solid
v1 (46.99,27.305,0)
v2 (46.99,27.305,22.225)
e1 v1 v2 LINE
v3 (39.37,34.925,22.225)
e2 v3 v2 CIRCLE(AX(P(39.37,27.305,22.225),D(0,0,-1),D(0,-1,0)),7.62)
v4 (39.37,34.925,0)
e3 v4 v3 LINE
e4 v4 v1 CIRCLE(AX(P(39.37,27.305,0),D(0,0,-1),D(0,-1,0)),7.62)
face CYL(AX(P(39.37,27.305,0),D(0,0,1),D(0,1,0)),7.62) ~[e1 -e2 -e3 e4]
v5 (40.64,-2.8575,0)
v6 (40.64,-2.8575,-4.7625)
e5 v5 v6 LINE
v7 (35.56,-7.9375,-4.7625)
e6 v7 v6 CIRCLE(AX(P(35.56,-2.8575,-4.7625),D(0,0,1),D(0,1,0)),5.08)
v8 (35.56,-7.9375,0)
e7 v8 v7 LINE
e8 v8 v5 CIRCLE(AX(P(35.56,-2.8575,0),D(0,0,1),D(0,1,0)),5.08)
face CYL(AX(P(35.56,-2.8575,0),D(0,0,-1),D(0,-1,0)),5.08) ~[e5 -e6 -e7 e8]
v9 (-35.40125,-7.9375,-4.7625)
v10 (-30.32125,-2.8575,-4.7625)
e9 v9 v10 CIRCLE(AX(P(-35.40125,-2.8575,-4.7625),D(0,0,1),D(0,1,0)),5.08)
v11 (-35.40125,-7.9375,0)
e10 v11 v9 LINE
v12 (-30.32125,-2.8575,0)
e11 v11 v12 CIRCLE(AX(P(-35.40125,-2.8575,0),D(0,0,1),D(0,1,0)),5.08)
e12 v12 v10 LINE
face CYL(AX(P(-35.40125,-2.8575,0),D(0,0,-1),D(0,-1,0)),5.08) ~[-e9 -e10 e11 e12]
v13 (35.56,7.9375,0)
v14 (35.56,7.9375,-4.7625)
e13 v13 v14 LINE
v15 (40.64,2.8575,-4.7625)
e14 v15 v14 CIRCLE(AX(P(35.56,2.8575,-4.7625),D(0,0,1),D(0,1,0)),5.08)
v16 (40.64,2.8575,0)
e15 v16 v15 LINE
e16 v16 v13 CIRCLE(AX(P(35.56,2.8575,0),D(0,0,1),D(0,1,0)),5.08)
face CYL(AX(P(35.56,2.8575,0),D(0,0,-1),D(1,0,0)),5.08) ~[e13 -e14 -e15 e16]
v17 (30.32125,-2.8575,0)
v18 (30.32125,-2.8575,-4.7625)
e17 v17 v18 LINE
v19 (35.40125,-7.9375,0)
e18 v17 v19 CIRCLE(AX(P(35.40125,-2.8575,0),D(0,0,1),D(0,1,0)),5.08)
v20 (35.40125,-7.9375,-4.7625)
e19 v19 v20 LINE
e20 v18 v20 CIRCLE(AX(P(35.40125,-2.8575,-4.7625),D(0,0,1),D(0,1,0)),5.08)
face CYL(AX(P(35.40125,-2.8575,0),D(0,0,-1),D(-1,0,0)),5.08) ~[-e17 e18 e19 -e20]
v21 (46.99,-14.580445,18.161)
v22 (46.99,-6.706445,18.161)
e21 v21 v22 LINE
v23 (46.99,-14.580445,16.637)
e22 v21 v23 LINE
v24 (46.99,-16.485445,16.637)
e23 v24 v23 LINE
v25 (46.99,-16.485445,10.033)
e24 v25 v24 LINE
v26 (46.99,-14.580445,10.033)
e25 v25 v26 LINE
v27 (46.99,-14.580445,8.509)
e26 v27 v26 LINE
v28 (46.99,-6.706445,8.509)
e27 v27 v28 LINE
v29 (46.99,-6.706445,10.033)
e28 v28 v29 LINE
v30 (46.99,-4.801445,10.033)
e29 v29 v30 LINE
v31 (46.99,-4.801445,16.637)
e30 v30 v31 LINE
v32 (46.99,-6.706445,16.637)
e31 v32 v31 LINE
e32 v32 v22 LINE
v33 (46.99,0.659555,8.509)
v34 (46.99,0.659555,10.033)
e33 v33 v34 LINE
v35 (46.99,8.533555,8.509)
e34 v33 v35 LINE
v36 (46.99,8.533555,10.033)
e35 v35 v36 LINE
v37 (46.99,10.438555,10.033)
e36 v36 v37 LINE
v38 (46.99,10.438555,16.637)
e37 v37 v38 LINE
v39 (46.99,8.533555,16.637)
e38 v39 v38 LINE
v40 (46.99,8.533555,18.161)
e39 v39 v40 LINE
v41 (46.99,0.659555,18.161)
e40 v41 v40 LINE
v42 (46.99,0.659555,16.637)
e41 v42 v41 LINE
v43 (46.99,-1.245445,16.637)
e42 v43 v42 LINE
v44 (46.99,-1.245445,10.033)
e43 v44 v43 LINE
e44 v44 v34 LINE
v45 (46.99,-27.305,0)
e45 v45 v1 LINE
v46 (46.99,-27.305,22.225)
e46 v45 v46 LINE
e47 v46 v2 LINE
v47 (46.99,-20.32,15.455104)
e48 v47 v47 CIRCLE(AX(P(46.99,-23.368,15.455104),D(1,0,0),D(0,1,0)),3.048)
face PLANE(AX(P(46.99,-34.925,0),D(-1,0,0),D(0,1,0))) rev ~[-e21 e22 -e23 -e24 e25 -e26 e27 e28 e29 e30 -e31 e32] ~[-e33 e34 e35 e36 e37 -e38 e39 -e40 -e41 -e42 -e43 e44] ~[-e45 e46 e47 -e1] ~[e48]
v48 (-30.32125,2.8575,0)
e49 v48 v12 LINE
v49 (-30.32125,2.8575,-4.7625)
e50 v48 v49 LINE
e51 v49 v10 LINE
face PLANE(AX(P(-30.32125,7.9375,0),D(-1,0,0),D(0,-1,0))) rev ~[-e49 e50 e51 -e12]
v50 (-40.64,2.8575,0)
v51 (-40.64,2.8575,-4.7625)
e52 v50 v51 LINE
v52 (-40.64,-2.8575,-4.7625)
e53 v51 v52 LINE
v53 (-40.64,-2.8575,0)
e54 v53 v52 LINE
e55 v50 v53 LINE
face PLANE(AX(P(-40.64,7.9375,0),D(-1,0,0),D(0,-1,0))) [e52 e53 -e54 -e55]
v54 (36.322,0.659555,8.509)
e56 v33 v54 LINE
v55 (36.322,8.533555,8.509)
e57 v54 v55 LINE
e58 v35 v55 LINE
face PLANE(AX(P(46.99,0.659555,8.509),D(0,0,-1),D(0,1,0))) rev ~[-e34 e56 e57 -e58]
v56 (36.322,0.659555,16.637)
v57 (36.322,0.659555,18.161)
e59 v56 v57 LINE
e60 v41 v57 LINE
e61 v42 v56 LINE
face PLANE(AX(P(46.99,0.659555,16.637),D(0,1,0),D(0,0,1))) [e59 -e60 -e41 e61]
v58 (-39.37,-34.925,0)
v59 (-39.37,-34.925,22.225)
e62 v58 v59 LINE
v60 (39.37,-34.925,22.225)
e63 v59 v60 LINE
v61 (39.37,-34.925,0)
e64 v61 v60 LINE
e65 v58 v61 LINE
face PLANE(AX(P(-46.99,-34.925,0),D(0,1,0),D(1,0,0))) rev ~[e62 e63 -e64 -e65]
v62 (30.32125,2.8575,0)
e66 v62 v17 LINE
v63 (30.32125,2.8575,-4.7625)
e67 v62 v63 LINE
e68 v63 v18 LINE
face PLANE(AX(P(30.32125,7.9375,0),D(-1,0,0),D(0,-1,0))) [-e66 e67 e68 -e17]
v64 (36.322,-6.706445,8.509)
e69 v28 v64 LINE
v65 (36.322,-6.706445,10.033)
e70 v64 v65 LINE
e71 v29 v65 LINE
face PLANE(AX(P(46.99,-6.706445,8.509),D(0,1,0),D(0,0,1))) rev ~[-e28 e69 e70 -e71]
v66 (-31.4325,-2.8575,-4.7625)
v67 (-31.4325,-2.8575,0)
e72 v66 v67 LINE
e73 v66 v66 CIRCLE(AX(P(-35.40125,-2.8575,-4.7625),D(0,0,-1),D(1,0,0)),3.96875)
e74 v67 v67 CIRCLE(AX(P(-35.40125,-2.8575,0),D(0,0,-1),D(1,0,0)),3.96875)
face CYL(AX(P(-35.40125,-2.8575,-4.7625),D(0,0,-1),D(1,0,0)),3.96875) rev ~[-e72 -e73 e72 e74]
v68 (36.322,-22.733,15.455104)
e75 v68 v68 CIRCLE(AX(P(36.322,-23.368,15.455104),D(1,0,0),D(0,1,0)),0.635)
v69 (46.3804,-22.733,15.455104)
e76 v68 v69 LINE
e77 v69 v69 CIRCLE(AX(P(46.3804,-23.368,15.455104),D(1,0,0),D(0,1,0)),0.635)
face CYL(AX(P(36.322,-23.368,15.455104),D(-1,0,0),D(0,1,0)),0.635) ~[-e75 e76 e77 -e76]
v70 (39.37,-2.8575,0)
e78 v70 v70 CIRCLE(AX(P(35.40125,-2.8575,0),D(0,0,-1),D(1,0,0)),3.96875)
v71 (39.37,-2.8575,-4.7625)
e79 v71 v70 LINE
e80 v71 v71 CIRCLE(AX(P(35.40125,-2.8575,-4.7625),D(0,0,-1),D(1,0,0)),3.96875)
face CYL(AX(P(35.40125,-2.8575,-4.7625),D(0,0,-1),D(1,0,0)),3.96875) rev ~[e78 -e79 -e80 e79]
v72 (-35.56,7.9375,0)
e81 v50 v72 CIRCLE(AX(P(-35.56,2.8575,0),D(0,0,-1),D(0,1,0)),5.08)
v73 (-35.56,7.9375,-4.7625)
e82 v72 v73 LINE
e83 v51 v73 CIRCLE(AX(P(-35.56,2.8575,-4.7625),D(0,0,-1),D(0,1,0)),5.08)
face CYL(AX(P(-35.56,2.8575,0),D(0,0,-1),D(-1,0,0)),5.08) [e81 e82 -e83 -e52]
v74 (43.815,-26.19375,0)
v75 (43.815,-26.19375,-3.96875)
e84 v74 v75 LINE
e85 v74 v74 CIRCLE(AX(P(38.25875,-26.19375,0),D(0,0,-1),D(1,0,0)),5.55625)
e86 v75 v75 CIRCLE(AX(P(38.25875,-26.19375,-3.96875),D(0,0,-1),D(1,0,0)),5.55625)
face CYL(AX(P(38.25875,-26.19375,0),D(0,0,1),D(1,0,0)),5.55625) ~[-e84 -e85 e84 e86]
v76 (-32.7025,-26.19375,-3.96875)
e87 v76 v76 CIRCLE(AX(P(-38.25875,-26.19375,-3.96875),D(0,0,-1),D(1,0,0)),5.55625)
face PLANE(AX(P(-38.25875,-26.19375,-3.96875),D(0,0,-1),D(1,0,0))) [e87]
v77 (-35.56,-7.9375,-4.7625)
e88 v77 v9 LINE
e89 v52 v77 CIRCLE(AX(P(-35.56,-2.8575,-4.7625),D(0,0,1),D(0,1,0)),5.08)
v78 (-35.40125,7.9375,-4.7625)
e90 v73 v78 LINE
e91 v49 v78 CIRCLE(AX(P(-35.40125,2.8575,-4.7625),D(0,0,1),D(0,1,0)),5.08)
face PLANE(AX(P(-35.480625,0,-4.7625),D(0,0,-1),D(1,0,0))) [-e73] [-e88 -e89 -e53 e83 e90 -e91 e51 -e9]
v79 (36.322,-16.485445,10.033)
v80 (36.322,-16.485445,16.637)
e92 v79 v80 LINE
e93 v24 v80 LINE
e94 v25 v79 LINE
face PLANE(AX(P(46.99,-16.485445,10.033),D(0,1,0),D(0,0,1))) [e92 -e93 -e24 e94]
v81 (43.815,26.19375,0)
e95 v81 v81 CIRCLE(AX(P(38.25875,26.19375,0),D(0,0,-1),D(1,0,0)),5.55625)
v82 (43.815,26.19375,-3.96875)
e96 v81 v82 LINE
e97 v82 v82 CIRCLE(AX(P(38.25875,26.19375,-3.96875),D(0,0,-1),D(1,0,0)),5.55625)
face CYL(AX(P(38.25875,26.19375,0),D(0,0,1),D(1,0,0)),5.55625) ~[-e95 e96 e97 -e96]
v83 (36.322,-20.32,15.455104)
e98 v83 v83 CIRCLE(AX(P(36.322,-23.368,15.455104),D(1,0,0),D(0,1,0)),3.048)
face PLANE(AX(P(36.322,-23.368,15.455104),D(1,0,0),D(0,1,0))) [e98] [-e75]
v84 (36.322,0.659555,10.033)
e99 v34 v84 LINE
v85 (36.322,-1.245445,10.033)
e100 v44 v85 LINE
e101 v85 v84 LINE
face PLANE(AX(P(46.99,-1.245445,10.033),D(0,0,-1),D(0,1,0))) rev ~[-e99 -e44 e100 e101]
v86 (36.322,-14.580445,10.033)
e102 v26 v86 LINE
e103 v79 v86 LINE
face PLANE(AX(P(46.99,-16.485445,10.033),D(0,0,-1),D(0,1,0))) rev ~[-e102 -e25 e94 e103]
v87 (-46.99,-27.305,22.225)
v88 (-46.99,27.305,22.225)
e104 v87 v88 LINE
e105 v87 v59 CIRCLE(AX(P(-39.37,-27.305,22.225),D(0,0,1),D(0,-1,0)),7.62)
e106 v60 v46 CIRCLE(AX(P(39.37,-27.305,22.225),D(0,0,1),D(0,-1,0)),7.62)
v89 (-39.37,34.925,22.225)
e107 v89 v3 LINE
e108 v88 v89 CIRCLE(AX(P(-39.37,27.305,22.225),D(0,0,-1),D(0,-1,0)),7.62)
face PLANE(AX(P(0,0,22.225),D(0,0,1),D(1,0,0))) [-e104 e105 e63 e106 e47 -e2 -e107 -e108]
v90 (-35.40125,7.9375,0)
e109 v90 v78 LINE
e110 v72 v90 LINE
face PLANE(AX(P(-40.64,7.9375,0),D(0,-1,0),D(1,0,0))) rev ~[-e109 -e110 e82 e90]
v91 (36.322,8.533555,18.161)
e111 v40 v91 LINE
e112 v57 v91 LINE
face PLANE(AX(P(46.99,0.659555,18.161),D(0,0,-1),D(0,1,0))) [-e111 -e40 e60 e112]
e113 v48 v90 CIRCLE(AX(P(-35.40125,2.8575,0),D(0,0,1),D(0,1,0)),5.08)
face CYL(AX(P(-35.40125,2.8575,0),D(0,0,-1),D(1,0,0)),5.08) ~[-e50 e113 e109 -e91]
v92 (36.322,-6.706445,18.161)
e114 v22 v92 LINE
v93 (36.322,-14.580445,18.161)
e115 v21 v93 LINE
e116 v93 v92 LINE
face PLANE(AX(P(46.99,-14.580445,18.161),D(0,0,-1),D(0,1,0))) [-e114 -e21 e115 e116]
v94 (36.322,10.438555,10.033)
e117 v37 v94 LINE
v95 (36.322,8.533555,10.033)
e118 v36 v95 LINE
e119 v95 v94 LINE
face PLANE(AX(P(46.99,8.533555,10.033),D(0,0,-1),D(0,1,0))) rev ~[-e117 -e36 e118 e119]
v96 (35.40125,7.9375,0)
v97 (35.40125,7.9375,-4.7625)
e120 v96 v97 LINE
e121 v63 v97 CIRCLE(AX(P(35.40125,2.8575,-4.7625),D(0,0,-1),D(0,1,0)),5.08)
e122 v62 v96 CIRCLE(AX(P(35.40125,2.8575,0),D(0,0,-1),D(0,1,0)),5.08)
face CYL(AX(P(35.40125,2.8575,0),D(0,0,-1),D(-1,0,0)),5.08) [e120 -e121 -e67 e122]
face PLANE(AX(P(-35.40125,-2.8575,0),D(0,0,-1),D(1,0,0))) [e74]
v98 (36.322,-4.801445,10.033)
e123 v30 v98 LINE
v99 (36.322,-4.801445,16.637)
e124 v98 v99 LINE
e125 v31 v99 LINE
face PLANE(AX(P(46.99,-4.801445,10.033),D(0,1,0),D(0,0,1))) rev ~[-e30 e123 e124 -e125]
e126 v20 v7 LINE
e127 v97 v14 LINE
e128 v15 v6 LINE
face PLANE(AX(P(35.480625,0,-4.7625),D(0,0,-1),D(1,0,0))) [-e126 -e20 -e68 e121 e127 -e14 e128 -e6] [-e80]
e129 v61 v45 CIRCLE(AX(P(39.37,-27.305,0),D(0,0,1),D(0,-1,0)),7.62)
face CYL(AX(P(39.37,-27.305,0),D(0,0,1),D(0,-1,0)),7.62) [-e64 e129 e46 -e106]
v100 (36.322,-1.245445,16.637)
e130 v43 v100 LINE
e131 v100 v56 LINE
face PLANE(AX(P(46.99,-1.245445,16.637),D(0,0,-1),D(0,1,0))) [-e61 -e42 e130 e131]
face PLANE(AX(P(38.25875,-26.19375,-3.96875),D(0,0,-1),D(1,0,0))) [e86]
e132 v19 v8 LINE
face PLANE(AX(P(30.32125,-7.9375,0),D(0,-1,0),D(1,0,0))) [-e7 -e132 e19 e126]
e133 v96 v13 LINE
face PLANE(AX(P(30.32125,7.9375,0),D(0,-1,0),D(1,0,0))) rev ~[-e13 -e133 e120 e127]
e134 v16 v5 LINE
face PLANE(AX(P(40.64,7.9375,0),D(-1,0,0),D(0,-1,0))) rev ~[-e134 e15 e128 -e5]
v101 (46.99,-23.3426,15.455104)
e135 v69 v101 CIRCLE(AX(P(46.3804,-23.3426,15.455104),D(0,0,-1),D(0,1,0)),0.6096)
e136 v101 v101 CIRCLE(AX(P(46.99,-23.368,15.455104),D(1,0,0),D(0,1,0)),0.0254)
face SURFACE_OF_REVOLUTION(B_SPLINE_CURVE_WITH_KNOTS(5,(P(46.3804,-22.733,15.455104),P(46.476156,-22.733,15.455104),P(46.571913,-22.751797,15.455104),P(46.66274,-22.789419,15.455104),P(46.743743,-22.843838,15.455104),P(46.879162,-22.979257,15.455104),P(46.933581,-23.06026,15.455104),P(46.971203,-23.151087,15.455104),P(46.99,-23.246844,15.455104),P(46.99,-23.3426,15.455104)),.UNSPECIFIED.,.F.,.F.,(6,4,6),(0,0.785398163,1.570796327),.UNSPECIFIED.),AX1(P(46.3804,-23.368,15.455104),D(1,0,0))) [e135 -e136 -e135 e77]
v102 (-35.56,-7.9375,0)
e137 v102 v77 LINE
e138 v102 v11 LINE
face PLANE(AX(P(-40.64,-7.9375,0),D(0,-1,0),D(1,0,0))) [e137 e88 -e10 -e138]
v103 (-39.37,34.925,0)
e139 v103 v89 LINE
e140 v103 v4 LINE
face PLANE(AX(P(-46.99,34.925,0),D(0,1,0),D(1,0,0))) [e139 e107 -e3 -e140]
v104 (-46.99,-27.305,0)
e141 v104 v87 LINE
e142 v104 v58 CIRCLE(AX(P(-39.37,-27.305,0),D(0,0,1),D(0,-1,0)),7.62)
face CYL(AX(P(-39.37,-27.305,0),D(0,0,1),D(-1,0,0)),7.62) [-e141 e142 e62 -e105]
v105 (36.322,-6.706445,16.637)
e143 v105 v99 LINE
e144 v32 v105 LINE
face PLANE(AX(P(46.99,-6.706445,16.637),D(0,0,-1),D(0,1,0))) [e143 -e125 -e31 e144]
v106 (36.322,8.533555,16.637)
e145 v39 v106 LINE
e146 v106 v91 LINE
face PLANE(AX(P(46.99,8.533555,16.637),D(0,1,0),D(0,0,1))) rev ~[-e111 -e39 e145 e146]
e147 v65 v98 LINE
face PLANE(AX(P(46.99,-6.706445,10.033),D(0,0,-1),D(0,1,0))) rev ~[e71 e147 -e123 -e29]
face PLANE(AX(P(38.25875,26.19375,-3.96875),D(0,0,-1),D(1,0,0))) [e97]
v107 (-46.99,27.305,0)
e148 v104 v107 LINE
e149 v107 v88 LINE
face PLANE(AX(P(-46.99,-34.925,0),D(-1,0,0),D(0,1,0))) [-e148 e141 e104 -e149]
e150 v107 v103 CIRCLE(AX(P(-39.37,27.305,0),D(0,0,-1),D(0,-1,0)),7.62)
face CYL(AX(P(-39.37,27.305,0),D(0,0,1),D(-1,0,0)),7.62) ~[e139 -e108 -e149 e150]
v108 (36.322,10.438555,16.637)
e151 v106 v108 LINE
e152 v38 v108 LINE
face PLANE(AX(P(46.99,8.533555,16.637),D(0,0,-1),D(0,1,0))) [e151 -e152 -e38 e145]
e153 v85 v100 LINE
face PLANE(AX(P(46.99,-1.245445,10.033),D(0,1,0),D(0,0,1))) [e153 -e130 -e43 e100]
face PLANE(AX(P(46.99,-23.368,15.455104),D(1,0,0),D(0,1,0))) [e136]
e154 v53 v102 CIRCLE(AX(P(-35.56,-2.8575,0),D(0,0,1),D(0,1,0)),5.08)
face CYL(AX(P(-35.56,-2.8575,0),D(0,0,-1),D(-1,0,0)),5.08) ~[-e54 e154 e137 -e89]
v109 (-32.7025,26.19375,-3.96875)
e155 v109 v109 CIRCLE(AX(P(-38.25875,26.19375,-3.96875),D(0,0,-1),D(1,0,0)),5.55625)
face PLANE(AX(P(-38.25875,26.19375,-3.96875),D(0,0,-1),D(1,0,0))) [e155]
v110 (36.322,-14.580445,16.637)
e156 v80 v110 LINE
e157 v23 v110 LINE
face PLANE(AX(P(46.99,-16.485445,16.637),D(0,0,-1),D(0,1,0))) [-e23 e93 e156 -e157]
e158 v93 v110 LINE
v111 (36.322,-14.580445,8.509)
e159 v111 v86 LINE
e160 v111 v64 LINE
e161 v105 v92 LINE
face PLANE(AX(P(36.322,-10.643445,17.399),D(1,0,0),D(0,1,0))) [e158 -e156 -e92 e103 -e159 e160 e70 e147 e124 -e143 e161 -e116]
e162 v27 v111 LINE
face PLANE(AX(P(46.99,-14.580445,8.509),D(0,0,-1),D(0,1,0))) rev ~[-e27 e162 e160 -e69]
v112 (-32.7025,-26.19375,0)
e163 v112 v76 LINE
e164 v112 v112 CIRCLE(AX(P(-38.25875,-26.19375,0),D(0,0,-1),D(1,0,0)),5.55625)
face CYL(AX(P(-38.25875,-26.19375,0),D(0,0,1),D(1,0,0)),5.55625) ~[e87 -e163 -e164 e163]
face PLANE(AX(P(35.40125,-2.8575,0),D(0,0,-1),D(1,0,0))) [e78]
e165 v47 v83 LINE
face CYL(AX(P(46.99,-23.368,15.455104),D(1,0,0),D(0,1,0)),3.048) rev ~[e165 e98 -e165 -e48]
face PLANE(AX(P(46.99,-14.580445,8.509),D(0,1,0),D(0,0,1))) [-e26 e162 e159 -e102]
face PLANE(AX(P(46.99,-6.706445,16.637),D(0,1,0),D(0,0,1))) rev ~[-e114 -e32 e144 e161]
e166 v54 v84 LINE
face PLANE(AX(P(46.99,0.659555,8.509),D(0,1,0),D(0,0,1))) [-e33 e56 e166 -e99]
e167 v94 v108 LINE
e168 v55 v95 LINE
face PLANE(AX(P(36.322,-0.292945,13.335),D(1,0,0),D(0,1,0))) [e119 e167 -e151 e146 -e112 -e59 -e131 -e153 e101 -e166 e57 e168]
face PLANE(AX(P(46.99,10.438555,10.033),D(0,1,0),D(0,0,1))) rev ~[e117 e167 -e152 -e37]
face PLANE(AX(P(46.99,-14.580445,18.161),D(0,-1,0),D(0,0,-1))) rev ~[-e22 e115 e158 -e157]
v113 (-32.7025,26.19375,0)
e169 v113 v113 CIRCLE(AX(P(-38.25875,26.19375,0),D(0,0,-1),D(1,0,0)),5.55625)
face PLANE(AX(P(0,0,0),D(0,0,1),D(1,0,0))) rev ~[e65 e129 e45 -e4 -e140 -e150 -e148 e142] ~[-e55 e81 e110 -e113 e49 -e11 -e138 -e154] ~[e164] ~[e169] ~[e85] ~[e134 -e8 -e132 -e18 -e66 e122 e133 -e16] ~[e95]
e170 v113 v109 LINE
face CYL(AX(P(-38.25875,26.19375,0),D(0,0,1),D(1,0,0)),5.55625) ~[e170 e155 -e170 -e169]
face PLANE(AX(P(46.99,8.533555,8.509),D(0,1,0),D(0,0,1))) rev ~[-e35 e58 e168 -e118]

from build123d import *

# Parameters (mm, degrees)
F0_W      = 93.98
F0_H      = 69.85
F1_DEPTH  = 22.225
F2_W      = 10.31875
F2_H      = 15.875
F3_DEPTH  = 4.7625
F4_R      = 5.08
F5_R      = 5.55625
F6_DEPTH  = 3.96875
F8_R      = 7.62
F9_W      = 7.874
F9_H      = 1.524
F9_W_2    = 1.905
F9_H_2    = 6.604
F10_DEPTH = 10.668
F11_DEPTH = 10.668
F9_R      = 3.048
F12_DEPTH = 10.668
F13_R     = 0.635
F14_DEPTH = 10.668
F15_R     = 0.6096
F7_R      = 3.96875
F16_DEPTH = 4.7625


with BuildPart() as f1:
    # F0 (on Top) → F1 (new body)
    with BuildSketch(Plane.XY):
        Rectangle(F0_W, F0_H)
    extrude(amount=F1_DEPTH)

    # F2 (on face) → F3 (join)
    with BuildSketch(Plane(origin=(0, 0, 0), x_dir=(1, 0, 0), z_dir=(0, 0, -1))):
        with Locations((-35.480625, 0)):
            Rectangle(F2_W, F2_H)
        with Locations((35.480625, 0)):
            Rectangle(F2_W, F2_H)
    extrude(amount=F3_DEPTH)

    # F4
    f4_edges = [f1.edges().sort_by_distance(p)[0] for p in [
        (-30.32125, -7.9375, -2.38125),
        (-40.64, -7.9375, -2.38125),
        (30.32125, -7.9375, -2.38125),
        (40.64, -7.9375, -2.38125),
        (40.64, 7.9375, -2.38125),
        (30.32125, 7.9375, -2.38125),
        (-30.32125, 7.9375, -2.38125),
        (-40.64, 7.9375, -2.38125),
    ]]
    fillet(f4_edges, radius=F4_R)

    # F5 (on face) → F6 (join)
    with BuildSketch(Plane(origin=(0, 0, 0), x_dir=(1, 0, 0), z_dir=(0, 0, -1))):
        with Locations((38.25875, 26.19375)):
            Circle(F5_R)
        with Locations((-38.25875, -26.19375)):
            Circle(F5_R)
        with Locations((38.25875, -26.19375)):
            Circle(F5_R)
        with Locations((-38.25875, 26.19375)):
            Circle(F5_R)
    extrude(amount=F6_DEPTH)

    # F8
    f8_edges = [f1.edges().sort_by_distance(p)[0] for p in [
        (-46.99, -34.925, 11.1125),
        (46.99, -34.925, 11.1125),
        (46.99, 34.925, 11.1125),
        (-46.99, 34.925, 11.1125),
    ]]
    fillet(f8_edges, radius=F8_R)

    # F9 (on face) → F10 (cut)
    with BuildSketch(Plane.YZ.offset(46.99)):
        with Locations((-10.643445003, 17.399)):
            Rectangle(F9_W, F9_H)
        with Locations((-5.753945003, 13.335)):
            Rectangle(F9_W_2, F9_H_2)
        with Locations((-10.643445003, 13.335)):
            Rectangle(F9_W, F9_H_2)
        with Locations((-15.532945003, 13.335)):
            Rectangle(F9_W_2, F9_H_2)
        with Locations((-10.643445003, 9.271)):
            Rectangle(F9_W, F9_H)
    extrude(amount=-F10_DEPTH, mode=Mode.SUBTRACT)

    # F9 (on face) → F11 (cut)
    with BuildSketch(Plane.YZ.offset(46.99)):
        with Locations((-0.292945003, 13.335)):
            Rectangle(F9_W_2, F9_H_2)
        with Locations((4.596554997, 17.399)):
            Rectangle(F9_W, F9_H)
        with Locations((4.596554997, 9.271)):
            Rectangle(F9_W, F9_H)
        with Locations((4.596554997, 13.335)):
            Rectangle(F9_W, F9_H_2)
        with Locations((9.486054997, 13.335)):
            Rectangle(F9_W_2, F9_H_2)
    extrude(amount=-F11_DEPTH, mode=Mode.SUBTRACT)

    # F9 (on face) → F12 (cut)
    with BuildSketch(Plane.YZ.offset(46.99)):
        with Locations((-23.368, 15.4551044106)):
            Circle(F9_R)
    extrude(amount=-F12_DEPTH, mode=Mode.SUBTRACT)

    # F13 (on face) → F14 (join)
    with BuildSketch(Plane.YZ.offset(36.322)):
        with Locations((-23.368, 15.4551044106)):
            Circle(F13_R)
    extrude(amount=F14_DEPTH)

    # F15
    f15_edges = [f1.edges().sort_by_distance(p)[0] for p in [
        (46.99, -24.003, 15.455104),
    ]]
    fillet(f15_edges, radius=F15_R)

    # F7 (on face) → F16 (cut)
    with BuildSketch(Plane(origin=(0, 0, -4.7625), x_dir=(1, 0, 0), z_dir=(0, 0, -1))):
        with Locations((-35.40125, 2.8575)):
            Circle(F7_R)
        with Locations((35.40125, 2.8575)):
            Circle(F7_R)
    extrude(amount=-F16_DEPTH, mode=Mode.SUBTRACT)


solid = f1.part
